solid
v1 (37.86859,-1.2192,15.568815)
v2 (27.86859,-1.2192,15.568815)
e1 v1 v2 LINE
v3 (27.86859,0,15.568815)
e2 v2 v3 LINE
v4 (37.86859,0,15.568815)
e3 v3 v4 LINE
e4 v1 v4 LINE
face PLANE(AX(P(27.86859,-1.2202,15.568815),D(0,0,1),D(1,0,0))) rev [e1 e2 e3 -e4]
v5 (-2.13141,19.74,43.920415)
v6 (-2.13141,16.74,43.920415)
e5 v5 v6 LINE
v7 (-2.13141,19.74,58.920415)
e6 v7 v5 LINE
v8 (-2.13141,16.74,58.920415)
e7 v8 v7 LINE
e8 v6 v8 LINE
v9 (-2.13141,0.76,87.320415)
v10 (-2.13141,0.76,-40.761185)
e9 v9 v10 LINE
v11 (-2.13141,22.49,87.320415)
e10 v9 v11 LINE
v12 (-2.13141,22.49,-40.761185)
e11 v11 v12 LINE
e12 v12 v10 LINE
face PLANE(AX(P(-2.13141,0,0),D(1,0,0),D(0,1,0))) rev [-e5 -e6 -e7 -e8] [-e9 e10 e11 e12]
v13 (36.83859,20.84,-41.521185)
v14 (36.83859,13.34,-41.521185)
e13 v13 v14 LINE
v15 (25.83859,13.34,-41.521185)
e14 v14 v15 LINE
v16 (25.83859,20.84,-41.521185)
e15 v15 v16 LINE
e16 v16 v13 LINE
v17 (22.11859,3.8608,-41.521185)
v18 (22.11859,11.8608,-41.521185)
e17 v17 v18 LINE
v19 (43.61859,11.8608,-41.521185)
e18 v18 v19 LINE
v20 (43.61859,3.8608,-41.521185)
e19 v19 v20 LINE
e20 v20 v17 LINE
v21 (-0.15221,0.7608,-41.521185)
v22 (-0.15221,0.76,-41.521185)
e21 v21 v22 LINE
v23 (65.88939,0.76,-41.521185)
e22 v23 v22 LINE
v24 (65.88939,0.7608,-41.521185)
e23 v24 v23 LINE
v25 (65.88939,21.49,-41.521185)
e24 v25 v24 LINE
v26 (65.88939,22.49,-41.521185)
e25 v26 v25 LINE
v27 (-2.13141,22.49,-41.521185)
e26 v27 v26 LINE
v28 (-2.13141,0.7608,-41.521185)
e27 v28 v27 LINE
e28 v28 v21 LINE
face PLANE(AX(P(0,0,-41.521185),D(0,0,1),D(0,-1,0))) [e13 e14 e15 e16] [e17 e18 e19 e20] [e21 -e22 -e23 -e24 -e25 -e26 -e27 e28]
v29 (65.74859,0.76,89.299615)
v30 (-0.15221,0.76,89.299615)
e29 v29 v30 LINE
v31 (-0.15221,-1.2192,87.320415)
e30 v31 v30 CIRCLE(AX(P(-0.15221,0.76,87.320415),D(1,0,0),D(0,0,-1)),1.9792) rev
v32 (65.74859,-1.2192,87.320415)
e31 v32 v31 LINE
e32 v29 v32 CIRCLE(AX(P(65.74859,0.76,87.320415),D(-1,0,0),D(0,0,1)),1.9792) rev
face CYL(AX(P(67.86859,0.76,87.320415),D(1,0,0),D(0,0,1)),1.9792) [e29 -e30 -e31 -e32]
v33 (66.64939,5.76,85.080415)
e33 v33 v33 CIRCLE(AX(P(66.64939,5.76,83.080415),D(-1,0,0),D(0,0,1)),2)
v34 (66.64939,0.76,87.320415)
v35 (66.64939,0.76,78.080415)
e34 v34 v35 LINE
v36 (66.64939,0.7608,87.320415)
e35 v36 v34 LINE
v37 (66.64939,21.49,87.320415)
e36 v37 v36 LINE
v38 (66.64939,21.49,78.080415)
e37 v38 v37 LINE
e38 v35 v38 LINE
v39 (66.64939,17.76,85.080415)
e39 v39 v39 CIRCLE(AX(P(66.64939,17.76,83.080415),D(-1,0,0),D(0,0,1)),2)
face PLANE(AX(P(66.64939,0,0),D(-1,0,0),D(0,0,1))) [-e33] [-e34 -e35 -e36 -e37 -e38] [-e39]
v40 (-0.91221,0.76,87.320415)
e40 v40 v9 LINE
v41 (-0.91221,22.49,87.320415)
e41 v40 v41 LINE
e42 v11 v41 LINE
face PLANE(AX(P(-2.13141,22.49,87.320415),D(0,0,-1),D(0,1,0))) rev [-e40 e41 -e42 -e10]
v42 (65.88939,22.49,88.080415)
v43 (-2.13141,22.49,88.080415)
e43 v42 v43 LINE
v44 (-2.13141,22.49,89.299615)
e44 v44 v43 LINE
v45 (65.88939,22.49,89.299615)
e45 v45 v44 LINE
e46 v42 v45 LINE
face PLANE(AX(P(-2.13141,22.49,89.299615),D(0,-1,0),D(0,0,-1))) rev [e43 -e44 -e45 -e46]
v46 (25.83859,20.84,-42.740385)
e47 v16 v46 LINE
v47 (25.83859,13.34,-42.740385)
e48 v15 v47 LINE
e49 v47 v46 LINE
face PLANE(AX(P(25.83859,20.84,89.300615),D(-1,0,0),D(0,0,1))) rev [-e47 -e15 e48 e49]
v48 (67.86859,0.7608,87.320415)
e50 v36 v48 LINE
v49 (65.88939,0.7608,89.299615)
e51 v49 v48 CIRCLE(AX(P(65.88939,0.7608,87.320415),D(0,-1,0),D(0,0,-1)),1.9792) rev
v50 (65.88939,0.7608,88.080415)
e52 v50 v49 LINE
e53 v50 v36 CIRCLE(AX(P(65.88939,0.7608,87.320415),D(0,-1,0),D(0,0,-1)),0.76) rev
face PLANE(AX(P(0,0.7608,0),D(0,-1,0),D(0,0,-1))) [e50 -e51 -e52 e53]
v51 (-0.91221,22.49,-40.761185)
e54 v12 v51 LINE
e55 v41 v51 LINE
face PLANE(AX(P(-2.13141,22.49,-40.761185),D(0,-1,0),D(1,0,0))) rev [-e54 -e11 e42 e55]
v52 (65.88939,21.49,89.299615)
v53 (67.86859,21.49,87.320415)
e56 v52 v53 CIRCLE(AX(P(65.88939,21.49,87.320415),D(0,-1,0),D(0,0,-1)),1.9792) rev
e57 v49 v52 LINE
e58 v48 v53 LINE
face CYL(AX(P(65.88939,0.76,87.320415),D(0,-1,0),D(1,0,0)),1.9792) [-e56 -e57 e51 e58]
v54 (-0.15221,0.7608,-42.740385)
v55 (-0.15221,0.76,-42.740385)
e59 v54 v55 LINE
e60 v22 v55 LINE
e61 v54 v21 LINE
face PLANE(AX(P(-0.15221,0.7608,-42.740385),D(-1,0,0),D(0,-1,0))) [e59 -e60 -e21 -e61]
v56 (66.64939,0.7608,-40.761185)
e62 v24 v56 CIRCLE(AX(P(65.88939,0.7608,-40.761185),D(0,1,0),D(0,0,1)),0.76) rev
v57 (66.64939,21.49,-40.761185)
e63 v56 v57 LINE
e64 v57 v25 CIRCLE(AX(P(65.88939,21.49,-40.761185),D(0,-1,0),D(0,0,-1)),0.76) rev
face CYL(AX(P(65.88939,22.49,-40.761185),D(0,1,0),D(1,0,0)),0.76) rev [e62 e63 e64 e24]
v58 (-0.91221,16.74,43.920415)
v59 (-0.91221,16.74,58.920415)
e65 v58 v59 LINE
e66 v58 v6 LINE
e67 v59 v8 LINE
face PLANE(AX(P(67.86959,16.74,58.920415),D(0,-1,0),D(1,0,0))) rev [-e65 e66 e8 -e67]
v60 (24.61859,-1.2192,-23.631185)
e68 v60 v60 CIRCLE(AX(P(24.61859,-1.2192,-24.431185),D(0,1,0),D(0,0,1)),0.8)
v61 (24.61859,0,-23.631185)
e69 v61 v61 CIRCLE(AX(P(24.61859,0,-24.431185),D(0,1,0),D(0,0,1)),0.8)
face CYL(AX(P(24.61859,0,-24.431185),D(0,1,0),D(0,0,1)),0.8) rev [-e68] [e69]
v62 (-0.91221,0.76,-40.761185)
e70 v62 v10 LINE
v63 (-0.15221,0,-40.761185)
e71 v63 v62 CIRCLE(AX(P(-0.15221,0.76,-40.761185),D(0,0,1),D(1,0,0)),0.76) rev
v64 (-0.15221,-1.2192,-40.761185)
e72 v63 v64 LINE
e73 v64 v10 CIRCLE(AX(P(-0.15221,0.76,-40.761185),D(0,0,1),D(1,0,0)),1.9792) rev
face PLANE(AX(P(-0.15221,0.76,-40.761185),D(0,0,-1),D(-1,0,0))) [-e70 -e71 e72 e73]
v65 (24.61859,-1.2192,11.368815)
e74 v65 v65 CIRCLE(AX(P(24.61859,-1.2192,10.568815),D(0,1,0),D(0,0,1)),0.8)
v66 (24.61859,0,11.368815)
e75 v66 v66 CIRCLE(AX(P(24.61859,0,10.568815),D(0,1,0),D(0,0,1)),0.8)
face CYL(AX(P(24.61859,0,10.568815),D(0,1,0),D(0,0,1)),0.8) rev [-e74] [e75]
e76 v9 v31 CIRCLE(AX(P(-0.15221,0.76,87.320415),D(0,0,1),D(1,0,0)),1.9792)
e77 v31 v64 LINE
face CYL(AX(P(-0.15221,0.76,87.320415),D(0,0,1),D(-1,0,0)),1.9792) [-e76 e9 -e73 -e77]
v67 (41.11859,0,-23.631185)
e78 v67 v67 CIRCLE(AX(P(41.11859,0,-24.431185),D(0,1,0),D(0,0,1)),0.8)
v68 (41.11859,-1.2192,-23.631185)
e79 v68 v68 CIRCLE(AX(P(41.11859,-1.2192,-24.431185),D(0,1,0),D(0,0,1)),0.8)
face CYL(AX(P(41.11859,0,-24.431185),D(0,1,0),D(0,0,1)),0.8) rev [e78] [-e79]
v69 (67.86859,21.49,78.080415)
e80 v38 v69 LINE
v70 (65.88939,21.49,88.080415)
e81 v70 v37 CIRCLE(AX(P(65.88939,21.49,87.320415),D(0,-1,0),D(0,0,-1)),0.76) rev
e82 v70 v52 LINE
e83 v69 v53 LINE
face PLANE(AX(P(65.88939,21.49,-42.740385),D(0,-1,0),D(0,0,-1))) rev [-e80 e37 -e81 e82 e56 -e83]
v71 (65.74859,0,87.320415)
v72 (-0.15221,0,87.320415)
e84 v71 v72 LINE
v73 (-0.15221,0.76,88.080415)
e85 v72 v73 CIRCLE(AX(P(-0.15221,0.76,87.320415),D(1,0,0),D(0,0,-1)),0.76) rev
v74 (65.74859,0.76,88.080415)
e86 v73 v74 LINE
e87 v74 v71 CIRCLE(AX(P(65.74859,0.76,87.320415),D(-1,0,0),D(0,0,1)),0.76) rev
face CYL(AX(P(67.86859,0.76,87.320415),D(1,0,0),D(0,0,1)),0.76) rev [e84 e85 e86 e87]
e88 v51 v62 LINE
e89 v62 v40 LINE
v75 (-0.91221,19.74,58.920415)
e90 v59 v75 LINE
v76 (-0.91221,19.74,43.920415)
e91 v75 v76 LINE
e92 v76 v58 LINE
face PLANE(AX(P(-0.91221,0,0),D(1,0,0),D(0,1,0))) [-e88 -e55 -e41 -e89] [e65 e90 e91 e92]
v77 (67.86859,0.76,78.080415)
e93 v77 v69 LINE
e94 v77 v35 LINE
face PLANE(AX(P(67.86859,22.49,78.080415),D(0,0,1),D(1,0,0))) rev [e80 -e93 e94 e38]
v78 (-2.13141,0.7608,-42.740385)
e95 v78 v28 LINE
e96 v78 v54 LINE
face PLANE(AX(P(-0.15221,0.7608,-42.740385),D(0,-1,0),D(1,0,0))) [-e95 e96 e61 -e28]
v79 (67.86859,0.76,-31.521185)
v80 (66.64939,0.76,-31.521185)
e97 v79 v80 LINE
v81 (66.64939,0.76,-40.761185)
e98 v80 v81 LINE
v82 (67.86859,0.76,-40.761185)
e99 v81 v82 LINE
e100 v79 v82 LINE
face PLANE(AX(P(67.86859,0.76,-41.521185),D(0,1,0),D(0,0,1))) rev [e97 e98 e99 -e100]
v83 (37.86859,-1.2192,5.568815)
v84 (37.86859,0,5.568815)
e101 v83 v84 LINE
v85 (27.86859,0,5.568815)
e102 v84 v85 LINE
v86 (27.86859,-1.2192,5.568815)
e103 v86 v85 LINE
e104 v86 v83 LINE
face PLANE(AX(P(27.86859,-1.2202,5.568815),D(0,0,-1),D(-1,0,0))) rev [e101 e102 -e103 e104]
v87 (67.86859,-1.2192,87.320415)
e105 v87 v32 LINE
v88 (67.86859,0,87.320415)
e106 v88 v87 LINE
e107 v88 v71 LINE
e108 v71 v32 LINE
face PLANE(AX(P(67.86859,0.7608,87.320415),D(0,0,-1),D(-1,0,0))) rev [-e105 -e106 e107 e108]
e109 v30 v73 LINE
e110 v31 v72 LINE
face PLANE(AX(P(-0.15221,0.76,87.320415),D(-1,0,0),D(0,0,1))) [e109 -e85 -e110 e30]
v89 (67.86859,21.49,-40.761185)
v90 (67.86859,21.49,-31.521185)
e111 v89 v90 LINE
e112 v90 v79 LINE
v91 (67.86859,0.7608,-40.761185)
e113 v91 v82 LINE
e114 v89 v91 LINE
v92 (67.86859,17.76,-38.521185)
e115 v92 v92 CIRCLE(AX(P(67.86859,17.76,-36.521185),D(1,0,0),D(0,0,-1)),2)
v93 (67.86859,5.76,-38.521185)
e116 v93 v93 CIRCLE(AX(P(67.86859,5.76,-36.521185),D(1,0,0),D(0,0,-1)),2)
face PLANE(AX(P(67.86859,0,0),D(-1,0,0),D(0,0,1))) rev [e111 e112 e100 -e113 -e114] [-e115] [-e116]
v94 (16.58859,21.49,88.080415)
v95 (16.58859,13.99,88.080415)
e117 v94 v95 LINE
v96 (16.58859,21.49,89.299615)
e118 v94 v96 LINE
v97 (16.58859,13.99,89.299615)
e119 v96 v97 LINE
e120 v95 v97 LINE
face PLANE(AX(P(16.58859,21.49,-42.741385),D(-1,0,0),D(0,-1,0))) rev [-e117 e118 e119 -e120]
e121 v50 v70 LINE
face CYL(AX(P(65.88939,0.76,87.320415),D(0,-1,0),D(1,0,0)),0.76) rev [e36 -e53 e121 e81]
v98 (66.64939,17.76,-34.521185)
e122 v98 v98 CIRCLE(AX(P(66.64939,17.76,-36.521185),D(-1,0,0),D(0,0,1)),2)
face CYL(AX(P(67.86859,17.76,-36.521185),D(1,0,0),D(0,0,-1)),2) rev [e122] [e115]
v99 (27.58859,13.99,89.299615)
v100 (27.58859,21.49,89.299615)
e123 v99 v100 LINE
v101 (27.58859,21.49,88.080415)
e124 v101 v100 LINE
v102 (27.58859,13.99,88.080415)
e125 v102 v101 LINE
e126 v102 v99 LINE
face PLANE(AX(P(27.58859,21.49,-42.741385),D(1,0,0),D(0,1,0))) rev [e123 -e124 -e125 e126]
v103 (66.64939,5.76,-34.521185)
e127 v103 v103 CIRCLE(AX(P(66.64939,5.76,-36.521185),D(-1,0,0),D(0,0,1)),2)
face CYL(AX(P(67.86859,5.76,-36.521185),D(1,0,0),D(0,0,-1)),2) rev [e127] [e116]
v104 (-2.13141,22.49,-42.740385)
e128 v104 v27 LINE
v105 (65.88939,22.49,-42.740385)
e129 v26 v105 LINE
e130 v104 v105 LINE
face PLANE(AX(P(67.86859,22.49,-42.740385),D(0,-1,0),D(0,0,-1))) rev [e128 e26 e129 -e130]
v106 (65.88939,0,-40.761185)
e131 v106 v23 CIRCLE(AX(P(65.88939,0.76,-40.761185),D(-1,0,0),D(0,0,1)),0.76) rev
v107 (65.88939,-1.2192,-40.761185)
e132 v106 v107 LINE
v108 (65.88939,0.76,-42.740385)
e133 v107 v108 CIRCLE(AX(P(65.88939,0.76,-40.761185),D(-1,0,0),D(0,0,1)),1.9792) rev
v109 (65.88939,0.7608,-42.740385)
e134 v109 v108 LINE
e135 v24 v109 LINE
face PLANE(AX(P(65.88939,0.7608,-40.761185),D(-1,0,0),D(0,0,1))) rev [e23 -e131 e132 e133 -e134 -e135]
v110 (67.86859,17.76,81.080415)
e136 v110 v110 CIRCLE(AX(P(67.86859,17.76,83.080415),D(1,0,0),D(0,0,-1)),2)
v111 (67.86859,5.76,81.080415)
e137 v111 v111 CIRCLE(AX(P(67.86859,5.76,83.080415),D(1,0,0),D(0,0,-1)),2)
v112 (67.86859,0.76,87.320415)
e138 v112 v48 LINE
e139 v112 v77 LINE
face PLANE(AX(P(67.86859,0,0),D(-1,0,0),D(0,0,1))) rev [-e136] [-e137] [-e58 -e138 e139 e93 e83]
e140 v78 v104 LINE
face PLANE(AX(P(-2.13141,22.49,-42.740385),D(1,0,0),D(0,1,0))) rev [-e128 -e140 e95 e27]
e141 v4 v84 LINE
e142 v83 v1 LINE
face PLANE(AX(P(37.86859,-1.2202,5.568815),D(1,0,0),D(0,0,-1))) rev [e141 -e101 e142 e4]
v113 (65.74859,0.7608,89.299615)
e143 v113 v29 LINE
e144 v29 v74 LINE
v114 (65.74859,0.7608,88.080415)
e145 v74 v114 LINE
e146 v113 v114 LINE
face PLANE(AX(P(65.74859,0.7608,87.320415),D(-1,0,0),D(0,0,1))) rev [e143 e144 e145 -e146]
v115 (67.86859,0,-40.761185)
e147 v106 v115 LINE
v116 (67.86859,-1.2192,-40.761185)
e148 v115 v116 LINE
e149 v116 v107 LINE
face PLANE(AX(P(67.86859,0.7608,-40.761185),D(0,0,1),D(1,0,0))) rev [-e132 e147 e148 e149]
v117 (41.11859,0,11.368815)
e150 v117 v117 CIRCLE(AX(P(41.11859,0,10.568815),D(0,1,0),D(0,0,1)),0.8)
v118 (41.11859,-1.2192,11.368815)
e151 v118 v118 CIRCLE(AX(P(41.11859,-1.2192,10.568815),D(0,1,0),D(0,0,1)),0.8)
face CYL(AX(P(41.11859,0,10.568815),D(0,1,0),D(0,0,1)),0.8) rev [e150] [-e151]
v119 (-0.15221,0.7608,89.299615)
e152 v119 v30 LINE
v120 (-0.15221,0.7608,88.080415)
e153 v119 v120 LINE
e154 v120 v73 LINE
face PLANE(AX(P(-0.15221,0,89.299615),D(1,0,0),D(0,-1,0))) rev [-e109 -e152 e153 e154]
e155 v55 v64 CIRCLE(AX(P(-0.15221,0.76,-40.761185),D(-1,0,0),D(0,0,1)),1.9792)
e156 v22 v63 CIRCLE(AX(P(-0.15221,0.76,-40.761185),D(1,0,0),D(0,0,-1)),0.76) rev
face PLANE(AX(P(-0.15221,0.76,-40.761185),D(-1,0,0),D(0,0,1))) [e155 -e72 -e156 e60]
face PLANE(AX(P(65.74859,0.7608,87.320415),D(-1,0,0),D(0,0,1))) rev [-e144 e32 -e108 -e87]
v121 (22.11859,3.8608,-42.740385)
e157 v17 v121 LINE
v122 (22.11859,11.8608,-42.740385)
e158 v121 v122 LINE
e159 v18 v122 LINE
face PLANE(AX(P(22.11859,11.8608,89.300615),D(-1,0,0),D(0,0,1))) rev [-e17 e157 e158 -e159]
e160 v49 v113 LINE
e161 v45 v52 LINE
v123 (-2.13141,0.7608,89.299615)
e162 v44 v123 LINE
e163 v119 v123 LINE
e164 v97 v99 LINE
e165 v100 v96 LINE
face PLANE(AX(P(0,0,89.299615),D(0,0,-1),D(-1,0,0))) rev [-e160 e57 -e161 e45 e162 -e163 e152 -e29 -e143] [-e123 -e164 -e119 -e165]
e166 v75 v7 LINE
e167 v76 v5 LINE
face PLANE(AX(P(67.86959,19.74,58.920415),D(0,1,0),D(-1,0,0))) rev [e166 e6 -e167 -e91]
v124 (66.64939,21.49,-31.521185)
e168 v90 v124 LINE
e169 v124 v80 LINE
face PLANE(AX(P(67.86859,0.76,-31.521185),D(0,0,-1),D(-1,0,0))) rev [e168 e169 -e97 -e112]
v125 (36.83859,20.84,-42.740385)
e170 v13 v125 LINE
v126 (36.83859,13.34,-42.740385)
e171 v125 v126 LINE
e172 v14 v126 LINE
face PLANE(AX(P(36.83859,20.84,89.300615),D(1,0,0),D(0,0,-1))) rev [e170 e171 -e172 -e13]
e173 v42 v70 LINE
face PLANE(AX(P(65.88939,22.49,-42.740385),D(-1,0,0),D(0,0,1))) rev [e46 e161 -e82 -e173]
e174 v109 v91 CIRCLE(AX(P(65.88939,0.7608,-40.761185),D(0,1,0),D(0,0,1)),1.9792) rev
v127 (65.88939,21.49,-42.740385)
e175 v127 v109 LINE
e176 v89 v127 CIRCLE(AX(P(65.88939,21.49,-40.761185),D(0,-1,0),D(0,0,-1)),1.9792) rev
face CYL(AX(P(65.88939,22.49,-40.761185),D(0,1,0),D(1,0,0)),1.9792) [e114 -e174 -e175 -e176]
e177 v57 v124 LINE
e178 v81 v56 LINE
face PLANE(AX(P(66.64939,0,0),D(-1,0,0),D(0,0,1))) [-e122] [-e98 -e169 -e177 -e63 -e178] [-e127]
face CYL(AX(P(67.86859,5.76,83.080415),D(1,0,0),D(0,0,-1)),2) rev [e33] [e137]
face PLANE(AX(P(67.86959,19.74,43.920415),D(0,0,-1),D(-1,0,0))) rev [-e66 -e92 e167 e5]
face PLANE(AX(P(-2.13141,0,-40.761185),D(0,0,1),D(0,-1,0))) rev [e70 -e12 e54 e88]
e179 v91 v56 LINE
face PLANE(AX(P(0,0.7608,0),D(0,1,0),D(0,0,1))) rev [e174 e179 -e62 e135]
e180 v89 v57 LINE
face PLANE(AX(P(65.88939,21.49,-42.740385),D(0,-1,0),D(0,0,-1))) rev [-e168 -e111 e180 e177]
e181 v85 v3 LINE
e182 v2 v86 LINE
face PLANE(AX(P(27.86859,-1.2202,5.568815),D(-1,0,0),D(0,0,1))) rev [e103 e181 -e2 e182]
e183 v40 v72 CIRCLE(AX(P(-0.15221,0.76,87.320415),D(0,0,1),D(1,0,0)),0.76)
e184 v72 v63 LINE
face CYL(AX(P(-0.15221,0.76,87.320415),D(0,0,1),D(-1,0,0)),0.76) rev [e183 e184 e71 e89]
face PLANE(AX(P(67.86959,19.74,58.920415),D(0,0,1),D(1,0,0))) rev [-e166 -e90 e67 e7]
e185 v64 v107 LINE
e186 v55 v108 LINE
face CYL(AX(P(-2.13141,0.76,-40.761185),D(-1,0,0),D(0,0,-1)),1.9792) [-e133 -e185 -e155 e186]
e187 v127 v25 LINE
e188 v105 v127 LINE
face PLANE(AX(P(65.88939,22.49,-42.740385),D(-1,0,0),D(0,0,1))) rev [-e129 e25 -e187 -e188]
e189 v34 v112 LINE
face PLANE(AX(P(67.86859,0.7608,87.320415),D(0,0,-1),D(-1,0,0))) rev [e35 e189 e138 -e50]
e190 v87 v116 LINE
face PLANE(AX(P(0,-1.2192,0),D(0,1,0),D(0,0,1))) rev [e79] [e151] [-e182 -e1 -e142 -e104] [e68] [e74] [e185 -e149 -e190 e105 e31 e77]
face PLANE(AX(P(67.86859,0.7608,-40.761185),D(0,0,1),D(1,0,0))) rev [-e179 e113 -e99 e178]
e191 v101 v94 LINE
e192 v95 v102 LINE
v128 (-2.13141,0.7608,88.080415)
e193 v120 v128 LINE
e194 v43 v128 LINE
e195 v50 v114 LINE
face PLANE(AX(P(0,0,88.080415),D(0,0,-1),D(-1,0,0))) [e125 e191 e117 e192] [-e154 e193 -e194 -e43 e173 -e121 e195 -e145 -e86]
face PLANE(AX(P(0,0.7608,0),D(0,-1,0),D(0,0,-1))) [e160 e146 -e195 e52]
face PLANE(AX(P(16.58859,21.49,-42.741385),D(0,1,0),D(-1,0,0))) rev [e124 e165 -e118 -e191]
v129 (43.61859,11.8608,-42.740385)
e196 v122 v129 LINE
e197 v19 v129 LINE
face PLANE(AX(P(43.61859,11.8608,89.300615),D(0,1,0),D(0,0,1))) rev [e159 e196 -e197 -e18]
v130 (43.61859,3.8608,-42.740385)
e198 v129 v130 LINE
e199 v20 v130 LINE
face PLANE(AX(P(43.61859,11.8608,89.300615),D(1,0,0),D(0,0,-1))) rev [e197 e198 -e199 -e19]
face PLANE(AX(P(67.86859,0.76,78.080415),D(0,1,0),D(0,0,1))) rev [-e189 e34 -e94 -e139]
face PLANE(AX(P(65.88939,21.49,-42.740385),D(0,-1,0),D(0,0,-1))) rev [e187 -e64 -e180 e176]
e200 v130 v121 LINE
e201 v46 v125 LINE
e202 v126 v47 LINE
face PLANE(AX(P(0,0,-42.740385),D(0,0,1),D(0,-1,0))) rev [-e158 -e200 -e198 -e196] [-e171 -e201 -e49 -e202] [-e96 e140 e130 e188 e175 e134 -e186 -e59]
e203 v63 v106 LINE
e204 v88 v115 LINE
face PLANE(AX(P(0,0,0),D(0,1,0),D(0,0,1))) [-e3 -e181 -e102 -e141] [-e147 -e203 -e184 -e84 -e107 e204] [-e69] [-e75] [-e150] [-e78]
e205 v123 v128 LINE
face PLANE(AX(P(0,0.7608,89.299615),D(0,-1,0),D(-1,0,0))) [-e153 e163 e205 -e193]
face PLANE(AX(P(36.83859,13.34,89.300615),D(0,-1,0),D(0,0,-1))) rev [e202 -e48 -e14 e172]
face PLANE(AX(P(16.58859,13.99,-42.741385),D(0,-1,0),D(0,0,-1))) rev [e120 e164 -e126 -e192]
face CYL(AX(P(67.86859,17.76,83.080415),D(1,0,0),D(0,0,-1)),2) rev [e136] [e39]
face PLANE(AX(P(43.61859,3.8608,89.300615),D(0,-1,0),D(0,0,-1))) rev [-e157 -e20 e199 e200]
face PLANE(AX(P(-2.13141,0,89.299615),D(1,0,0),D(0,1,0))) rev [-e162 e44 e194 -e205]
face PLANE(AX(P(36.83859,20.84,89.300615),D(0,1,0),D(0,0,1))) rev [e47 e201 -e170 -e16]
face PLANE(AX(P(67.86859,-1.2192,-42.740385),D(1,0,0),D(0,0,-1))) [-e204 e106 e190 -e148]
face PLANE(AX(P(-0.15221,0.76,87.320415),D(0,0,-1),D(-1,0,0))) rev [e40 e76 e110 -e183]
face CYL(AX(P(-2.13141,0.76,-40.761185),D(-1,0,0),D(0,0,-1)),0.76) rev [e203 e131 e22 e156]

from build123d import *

# Parameters (mm, degrees)
SKETCH2_W                    = 70
SKETCH2_H                    = 132.04
BASE_FLANGE1_DEPTH           = 1.2192
EDGE_FLANGE1_STRIP_W         = 6.3968
EDGE_FLANGE1_STRIP_H         = 1.2192
EDGE_FLANGE1_STRIP_CUT_DEPTH = 70
EDGE_FLANGE1_DEPTH           = 70
EDGE_FLANGE2_STRIP_W         = 6.3968
EDGE_FLANGE2_STRIP_H         = 1.2192
EDGE_FLANGE2_STRIP_CUT_DEPTH = 70
EDGE_FLANGE2_DEPTH           = 70
EDGE_FLANGE3_STRIP_W         = 6.3968
EDGE_FLANGE3_STRIP_H         = 1.2192
EDGE_FLANGE3_STRIP_CUT_DEPTH = 21.73
EDGE_FLANGE3_DEPTH           = 21.73
EDGE_FLANGE4_STRIP_W         = 6.3968
EDGE_FLANGE4_STRIP_H         = 1.2192
EDGE_FLANGE4_STRIP_CUT_DEPTH = 21.73
EDGE_FLANGE4_DEPTH           = 21.73
EDGE_FLANGE5_STRIP_W         = 6.3968
EDGE_FLANGE5_STRIP_H         = 1.2192
EDGE_FLANGE5_STRIP_CUT_DEPTH = 128.0816
EDGE_FLANGE5_DEPTH           = 128.0816
SKETCH24_W                   = 2.12
SKETCH24_H                   = 1.9792
CUT_EXTRUDE1_DEPTH           = 1.98
SKETCH29_W                   = 1.9792
SKETCH29_H                   = 2.12
CUT_EXTRUDE2_DEPTH           = 1.98
SKETCH30_W                   = 1.9792
SKETCH30_H                   = 1.9792
CUT_EXTRUDE3_DEPTH           = 1.98
SKETCH31_W                   = 1.9792
SKETCH31_H                   = 1.9792
CUT_EXTRUDE4_DEPTH           = 1.98
SKETCH34_W                   = 1.9792
SKETCH34_H                   = 1
CUT_EXTRUDE5_DEPTH           = 151.154943887
F_4_0MM_DOWEL_HOLE1_D        = 4
F_4_0MM_DOWEL_HOLE1_DEPTH    = 1.2192
CUT_EXTRUDE6_REACH           = 152.155
SKETCH38_W                   = 11
SKETCH38_H                   = 7.5
CUT_EXTRUDE7_REACH           = 152.155
SKETCH39_W                   = 11
SKETCH39_H                   = 7.5
CUT_EXTRUDE8_REACH           = 117.673
SKETCH40_W                   = 15
SKETCH40_H                   = 3
M2_TAPPED_HOLE1_D            = 1.6
CUT_EXTRUDE9_REACH           = 116.396
SKETCH41_W                   = 10
SKETCH41_H                   = 10
CUT_EXTRUDE10_REACH          = 152.155
SKETCH45_W                   = 21.5
SKETCH45_H                   = 8


# Sheet-metal steps are written as plain solids
with BuildPart() as part:
    # Sketch2 → Base-Flange1 (new body)
    with BuildSketch(Plane(origin=(0, 0, 0), x_dir=(1, 0, 0), z_dir=(0, 1, 0))):
        with Locations((32.868589744, -23.279615385)):
            Rectangle(SKETCH2_W, SKETCH2_H)
    extrude(amount=-BASE_FLANGE1_DEPTH)

    # Edge-Flange1 strip (across the edge) → Edge-Flange1 strip cut (cut)
    with BuildSketch(Plane(origin=(67.868589744, 0, -42.740384615), x_dir=(0, 0, 1), z_dir=(-1, 0, 0))):
        with Locations((-1.2192, -0.6096)):
            Rectangle(EDGE_FLANGE1_STRIP_W, EDGE_FLANGE1_STRIP_H)
    extrude(amount=EDGE_FLANGE1_STRIP_CUT_DEPTH, mode=Mode.SUBTRACT)

    # Edge-Flange1 section (across the edge) → Edge-Flange1 (add)
    with BuildSketch(Plane(origin=(67.868589744, 0, -42.740384615), x_dir=(0, 0, 1), z_dir=(-1, 0, 0))):
        with BuildLine():
            Line((0, 0.76), (0, 22.49))
            Line((0, 22.49), (1.2192, 22.49))
            Line((1.2192, 22.49), (1.2192, 0.76))
            ThreePointArc((1.2192, 0.76), (1.441798846, 0.222598846), (1.9792, 0))
            Line((1.9792, 0), (1.9792, -1.2192))
            ThreePointArc((1.9792, -1.2192), (0.579694259, -0.639505741), (0, 0.76))
        make_face()
    extrude(amount=EDGE_FLANGE1_DEPTH)

    # Edge-Flange2 strip (across the edge) → Edge-Flange2 strip cut (cut)
    with BuildSketch(Plane(origin=(-2.131410256, 0, 89.299615385), x_dir=(0, 0, -1), z_dir=(1, 0, 0))):
        with Locations((-1.2192, -0.6096)):
            Rectangle(EDGE_FLANGE2_STRIP_W, EDGE_FLANGE2_STRIP_H)
    extrude(amount=EDGE_FLANGE2_STRIP_CUT_DEPTH, mode=Mode.SUBTRACT)

    # Edge-Flange2 section (across the edge) → Edge-Flange2 (add)
    with BuildSketch(Plane(origin=(-2.131410256, 0, 89.299615385), x_dir=(0, 0, -1), z_dir=(1, 0, 0))):
        with BuildLine():
            Line((0, 0.76), (0, 22.49))
            Line((0, 22.49), (1.2192, 22.49))
            Line((1.2192, 22.49), (1.2192, 0.76))
            ThreePointArc((1.2192, 0.76), (1.441798846, 0.222598846), (1.9792, 0))
            Line((1.9792, 0), (1.9792, -1.2192))
            ThreePointArc((1.9792, -1.2192), (0.579694259, -0.639505741), (0, 0.76))
        make_face()
    extrude(amount=EDGE_FLANGE2_DEPTH)

    # Edge-Flange3 strip (across the edge) → Edge-Flange3 strip cut (cut)
    with BuildSketch(Plane(origin=(67.868589744, 0.76, -41.521184615), x_dir=(-1, 0, 0), z_dir=(0, 1, 0))):
        with Locations((-1.2192, -0.6096)):
            Rectangle(EDGE_FLANGE3_STRIP_W, EDGE_FLANGE3_STRIP_H)
    extrude(amount=EDGE_FLANGE3_STRIP_CUT_DEPTH, mode=Mode.SUBTRACT)

    # Edge-Flange3 section (across the edge) → Edge-Flange3 (add)
    with BuildSketch(Plane(origin=(67.868589744, 0.76, -41.521184615), x_dir=(-1, 0, 0), z_dir=(0, 1, 0))):
        with BuildLine():
            Line((0, 0.76), (0, 10))
            Line((0, 10), (1.2192, 10))
            Line((1.2192, 10), (1.2192, 0.76))
            ThreePointArc((1.2192, 0.76), (1.441798846, 0.222598846), (1.9792, 0))
            Line((1.9792, 0), (1.9792, -1.2192))
            ThreePointArc((1.9792, -1.2192), (0.579694259, -0.639505741), (0, 0.76))
        make_face()
    extrude(amount=EDGE_FLANGE3_DEPTH)

    # Edge-Flange4 strip (across the edge) → Edge-Flange4 strip cut (cut)
    with BuildSketch(Plane(origin=(67.868589744, 22.49, 88.080415385), x_dir=(-1, 0, 0), z_dir=(0, -1, 0))):
        with Locations((-1.2192, -0.6096)):
            Rectangle(EDGE_FLANGE4_STRIP_W, EDGE_FLANGE4_STRIP_H)
    extrude(amount=EDGE_FLANGE4_STRIP_CUT_DEPTH, mode=Mode.SUBTRACT)

    # Edge-Flange4 section (across the edge) → Edge-Flange4 (add)
    with BuildSketch(Plane(origin=(67.868589744, 22.49, 88.080415385), x_dir=(-1, 0, 0), z_dir=(0, -1, 0))):
        with BuildLine():
            Line((0, 0.76), (0, 10))
            Line((0, 10), (1.2192, 10))
            Line((1.2192, 10), (1.2192, 0.76))
            ThreePointArc((1.2192, 0.76), (1.441798846, 0.222598846), (1.9792, 0))
            Line((1.9792, 0), (1.9792, -1.2192))
            ThreePointArc((1.9792, -1.2192), (0.579694259, -0.639505741), (0, 0.76))
        make_face()
    extrude(amount=EDGE_FLANGE4_DEPTH)

    # Edge-Flange5 strip (across the edge) → Edge-Flange5 strip cut (cut)
    with BuildSketch(Plane(origin=(-2.131410256, 0, -40.761184615), x_dir=(1, 0, 0), z_dir=(0, 0, 1))):
        with Locations((-1.2192, -0.6096)):
            Rectangle(EDGE_FLANGE5_STRIP_W, EDGE_FLANGE5_STRIP_H)
    extrude(amount=EDGE_FLANGE5_STRIP_CUT_DEPTH, mode=Mode.SUBTRACT)

    # Edge-Flange5 section (across the edge) → Edge-Flange5 (add)
    with BuildSketch(Plane(origin=(-2.131410256, 0, -40.761184615), x_dir=(1, 0, 0), z_dir=(0, 0, 1))):
        with BuildLine():
            Line((0, 0.76), (0, 22.49))
            Line((0, 22.49), (1.2192, 22.49))
            Line((1.2192, 22.49), (1.2192, 0.76))
            ThreePointArc((1.2192, 0.76), (1.441798846, 0.222598846), (1.9792, 0))
            Line((1.9792, 0), (1.9792, -1.2192))
            ThreePointArc((1.9792, -1.2192), (0.579694259, -0.639505741), (0, 0.76))
        make_face()
    extrude(amount=EDGE_FLANGE5_DEPTH)

    # Sketch24 → Cut-Extrude1 (cut)
    with BuildSketch(Plane.XZ.offset(1.2192)):
        with Locations((66.808589744, 88.310015385)):
            Rectangle(SKETCH24_W, SKETCH24_H)
    extrude(amount=-CUT_EXTRUDE1_DEPTH, mode=Mode.SUBTRACT)

    # Sketch29 → Cut-Extrude2 (cut)
    with BuildSketch(Plane.XZ.offset(1.2192)):
        with Locations((-1.141810256, 88.380415385)):
            Rectangle(SKETCH29_W, SKETCH29_H)
    extrude(amount=-CUT_EXTRUDE2_DEPTH, mode=Mode.SUBTRACT)

    # Sketch30 → Cut-Extrude3 (cut)
    with BuildSketch(Plane.XZ.offset(1.2192)):
        with Locations((-1.141810256, -41.750784615)):
            Rectangle(SKETCH30_W, SKETCH30_H)
    extrude(amount=-CUT_EXTRUDE3_DEPTH, mode=Mode.SUBTRACT)

    # Sketch31 → Cut-Extrude4 (cut)
    with BuildSketch(Plane.XZ.offset(1.2192)):
        with Locations((66.878989744, -41.750784615)):
            Rectangle(SKETCH31_W, SKETCH31_H)
    extrude(amount=-CUT_EXTRUDE4_DEPTH, mode=Mode.SUBTRACT)

    # Sketch34 → Cut-Extrude5 (cut, through all)
    with BuildSketch(Plane.XY.offset(89.299615385)):
        with Locations((66.878989744, 21.99)):
            Rectangle(SKETCH34_W, SKETCH34_H)
    extrude(amount=-CUT_EXTRUDE5_DEPTH, mode=Mode.SUBTRACT)

    # Ø4.0mm Dowel Hole1
    with Locations(Plane(origin=(67.868589744, 0, 0), x_dir=(0, 0, -1), z_dir=(1, 0, 0))):
        with Locations((-83.080415385, 17.76), (-83.080415385, 5.76), (36.521184615, 17.76), (36.521184615, 5.76)):
            Hole(F_4_0MM_DOWEL_HOLE1_D / 2, depth=F_4_0MM_DOWEL_HOLE1_DEPTH)

    # Sketch38 → Cut-Extrude6 (cut, up to next)
    with BuildSketch(Plane.XY.offset(89.299615385), mode=Mode.PRIVATE) as cut_extrude6_sk1:
        with Locations((22.088589744, 17.74)):
            Rectangle(SKETCH38_W, SKETCH38_H)
    cut_extrude6_tool1 = extrude(cut_extrude6_sk1.sketch, amount=-CUT_EXTRUDE6_REACH, mode=Mode.PRIVATE) & part.part
    add(cut_extrude6_tool1.solids().sort_by_distance((22.08859, 17.74, 89.299615))[0], mode=Mode.SUBTRACT)

    # Sketch39 → Cut-Extrude7 (cut, up to next)
    with BuildSketch(Plane(origin=(0, 0, -42.740384615), x_dir=(-1, 0, 0), z_dir=(0, 0, -1)), mode=Mode.PRIVATE) as cut_extrude7_sk1:
        with Locations((-31.338589744, 17.09)):
            Rectangle(SKETCH39_W, SKETCH39_H)
    cut_extrude7_tool1 = extrude(cut_extrude7_sk1.sketch, amount=-CUT_EXTRUDE7_REACH, mode=Mode.PRIVATE) & part.part
    add(cut_extrude7_tool1.solids().sort_by_distance((31.33859, 17.09, -42.740385))[0], mode=Mode.SUBTRACT)

    # Sketch40 → Cut-Extrude8 (cut, up to next)
    with BuildSketch(Plane.ZY.offset(2.131410256), mode=Mode.PRIVATE) as cut_extrude8_sk1:
        with Locations((51.420415385, 18.24)):
            Rectangle(SKETCH40_W, SKETCH40_H)
    cut_extrude8_tool1 = extrude(cut_extrude8_sk1.sketch, amount=-CUT_EXTRUDE8_REACH, mode=Mode.PRIVATE) & part.part
    add(cut_extrude8_tool1.solids().sort_by_distance((-2.13141, 18.24, 51.420415))[0], mode=Mode.SUBTRACT)

    # M2 Tapped Hole1 (through all)
    with Locations(Plane(origin=(0, 0, 0), x_dir=(1, 0, 0), z_dir=(0, 1, 0))):
        with Locations((24.618589744, 24.431184615), (41.118589744, 24.431184615), (41.118589744, -10.568815385), (24.618589744, -10.568815385)):
            Hole(M2_TAPPED_HOLE1_D / 2)

    # Sketch41 → Cut-Extrude9 (cut, up to next)
    with BuildSketch(Plane(origin=(0, 0, 0), x_dir=(1, 0, 0), z_dir=(0, 1, 0)), mode=Mode.PRIVATE) as cut_extrude9_sk1:
        with Locations((32.868589744, -10.568815385)):
            Rectangle(SKETCH41_W, SKETCH41_H)
    cut_extrude9_tool1 = extrude(cut_extrude9_sk1.sketch, amount=-CUT_EXTRUDE9_REACH, mode=Mode.PRIVATE) & part.part
    add(cut_extrude9_tool1.solids().sort_by_distance((32.86859, 0, 10.568815))[0], mode=Mode.SUBTRACT)

    # Sketch45 → Cut-Extrude10 (cut, up to next)
    with BuildSketch(Plane(origin=(0, 0, -42.740384615), x_dir=(-1, 0, 0), z_dir=(0, 0, -1)), mode=Mode.PRIVATE) as cut_extrude10_sk1:
        with Locations((-32.868589744, 7.8608)):
            Rectangle(SKETCH45_W, SKETCH45_H)
    cut_extrude10_tool1 = extrude(cut_extrude10_sk1.sketch, amount=-CUT_EXTRUDE10_REACH, mode=Mode.PRIVATE) & part.part
    add(cut_extrude10_tool1.solids().sort_by_distance((32.86859, 7.8608, -42.740385))[0], mode=Mode.SUBTRACT)


solid = part.part
